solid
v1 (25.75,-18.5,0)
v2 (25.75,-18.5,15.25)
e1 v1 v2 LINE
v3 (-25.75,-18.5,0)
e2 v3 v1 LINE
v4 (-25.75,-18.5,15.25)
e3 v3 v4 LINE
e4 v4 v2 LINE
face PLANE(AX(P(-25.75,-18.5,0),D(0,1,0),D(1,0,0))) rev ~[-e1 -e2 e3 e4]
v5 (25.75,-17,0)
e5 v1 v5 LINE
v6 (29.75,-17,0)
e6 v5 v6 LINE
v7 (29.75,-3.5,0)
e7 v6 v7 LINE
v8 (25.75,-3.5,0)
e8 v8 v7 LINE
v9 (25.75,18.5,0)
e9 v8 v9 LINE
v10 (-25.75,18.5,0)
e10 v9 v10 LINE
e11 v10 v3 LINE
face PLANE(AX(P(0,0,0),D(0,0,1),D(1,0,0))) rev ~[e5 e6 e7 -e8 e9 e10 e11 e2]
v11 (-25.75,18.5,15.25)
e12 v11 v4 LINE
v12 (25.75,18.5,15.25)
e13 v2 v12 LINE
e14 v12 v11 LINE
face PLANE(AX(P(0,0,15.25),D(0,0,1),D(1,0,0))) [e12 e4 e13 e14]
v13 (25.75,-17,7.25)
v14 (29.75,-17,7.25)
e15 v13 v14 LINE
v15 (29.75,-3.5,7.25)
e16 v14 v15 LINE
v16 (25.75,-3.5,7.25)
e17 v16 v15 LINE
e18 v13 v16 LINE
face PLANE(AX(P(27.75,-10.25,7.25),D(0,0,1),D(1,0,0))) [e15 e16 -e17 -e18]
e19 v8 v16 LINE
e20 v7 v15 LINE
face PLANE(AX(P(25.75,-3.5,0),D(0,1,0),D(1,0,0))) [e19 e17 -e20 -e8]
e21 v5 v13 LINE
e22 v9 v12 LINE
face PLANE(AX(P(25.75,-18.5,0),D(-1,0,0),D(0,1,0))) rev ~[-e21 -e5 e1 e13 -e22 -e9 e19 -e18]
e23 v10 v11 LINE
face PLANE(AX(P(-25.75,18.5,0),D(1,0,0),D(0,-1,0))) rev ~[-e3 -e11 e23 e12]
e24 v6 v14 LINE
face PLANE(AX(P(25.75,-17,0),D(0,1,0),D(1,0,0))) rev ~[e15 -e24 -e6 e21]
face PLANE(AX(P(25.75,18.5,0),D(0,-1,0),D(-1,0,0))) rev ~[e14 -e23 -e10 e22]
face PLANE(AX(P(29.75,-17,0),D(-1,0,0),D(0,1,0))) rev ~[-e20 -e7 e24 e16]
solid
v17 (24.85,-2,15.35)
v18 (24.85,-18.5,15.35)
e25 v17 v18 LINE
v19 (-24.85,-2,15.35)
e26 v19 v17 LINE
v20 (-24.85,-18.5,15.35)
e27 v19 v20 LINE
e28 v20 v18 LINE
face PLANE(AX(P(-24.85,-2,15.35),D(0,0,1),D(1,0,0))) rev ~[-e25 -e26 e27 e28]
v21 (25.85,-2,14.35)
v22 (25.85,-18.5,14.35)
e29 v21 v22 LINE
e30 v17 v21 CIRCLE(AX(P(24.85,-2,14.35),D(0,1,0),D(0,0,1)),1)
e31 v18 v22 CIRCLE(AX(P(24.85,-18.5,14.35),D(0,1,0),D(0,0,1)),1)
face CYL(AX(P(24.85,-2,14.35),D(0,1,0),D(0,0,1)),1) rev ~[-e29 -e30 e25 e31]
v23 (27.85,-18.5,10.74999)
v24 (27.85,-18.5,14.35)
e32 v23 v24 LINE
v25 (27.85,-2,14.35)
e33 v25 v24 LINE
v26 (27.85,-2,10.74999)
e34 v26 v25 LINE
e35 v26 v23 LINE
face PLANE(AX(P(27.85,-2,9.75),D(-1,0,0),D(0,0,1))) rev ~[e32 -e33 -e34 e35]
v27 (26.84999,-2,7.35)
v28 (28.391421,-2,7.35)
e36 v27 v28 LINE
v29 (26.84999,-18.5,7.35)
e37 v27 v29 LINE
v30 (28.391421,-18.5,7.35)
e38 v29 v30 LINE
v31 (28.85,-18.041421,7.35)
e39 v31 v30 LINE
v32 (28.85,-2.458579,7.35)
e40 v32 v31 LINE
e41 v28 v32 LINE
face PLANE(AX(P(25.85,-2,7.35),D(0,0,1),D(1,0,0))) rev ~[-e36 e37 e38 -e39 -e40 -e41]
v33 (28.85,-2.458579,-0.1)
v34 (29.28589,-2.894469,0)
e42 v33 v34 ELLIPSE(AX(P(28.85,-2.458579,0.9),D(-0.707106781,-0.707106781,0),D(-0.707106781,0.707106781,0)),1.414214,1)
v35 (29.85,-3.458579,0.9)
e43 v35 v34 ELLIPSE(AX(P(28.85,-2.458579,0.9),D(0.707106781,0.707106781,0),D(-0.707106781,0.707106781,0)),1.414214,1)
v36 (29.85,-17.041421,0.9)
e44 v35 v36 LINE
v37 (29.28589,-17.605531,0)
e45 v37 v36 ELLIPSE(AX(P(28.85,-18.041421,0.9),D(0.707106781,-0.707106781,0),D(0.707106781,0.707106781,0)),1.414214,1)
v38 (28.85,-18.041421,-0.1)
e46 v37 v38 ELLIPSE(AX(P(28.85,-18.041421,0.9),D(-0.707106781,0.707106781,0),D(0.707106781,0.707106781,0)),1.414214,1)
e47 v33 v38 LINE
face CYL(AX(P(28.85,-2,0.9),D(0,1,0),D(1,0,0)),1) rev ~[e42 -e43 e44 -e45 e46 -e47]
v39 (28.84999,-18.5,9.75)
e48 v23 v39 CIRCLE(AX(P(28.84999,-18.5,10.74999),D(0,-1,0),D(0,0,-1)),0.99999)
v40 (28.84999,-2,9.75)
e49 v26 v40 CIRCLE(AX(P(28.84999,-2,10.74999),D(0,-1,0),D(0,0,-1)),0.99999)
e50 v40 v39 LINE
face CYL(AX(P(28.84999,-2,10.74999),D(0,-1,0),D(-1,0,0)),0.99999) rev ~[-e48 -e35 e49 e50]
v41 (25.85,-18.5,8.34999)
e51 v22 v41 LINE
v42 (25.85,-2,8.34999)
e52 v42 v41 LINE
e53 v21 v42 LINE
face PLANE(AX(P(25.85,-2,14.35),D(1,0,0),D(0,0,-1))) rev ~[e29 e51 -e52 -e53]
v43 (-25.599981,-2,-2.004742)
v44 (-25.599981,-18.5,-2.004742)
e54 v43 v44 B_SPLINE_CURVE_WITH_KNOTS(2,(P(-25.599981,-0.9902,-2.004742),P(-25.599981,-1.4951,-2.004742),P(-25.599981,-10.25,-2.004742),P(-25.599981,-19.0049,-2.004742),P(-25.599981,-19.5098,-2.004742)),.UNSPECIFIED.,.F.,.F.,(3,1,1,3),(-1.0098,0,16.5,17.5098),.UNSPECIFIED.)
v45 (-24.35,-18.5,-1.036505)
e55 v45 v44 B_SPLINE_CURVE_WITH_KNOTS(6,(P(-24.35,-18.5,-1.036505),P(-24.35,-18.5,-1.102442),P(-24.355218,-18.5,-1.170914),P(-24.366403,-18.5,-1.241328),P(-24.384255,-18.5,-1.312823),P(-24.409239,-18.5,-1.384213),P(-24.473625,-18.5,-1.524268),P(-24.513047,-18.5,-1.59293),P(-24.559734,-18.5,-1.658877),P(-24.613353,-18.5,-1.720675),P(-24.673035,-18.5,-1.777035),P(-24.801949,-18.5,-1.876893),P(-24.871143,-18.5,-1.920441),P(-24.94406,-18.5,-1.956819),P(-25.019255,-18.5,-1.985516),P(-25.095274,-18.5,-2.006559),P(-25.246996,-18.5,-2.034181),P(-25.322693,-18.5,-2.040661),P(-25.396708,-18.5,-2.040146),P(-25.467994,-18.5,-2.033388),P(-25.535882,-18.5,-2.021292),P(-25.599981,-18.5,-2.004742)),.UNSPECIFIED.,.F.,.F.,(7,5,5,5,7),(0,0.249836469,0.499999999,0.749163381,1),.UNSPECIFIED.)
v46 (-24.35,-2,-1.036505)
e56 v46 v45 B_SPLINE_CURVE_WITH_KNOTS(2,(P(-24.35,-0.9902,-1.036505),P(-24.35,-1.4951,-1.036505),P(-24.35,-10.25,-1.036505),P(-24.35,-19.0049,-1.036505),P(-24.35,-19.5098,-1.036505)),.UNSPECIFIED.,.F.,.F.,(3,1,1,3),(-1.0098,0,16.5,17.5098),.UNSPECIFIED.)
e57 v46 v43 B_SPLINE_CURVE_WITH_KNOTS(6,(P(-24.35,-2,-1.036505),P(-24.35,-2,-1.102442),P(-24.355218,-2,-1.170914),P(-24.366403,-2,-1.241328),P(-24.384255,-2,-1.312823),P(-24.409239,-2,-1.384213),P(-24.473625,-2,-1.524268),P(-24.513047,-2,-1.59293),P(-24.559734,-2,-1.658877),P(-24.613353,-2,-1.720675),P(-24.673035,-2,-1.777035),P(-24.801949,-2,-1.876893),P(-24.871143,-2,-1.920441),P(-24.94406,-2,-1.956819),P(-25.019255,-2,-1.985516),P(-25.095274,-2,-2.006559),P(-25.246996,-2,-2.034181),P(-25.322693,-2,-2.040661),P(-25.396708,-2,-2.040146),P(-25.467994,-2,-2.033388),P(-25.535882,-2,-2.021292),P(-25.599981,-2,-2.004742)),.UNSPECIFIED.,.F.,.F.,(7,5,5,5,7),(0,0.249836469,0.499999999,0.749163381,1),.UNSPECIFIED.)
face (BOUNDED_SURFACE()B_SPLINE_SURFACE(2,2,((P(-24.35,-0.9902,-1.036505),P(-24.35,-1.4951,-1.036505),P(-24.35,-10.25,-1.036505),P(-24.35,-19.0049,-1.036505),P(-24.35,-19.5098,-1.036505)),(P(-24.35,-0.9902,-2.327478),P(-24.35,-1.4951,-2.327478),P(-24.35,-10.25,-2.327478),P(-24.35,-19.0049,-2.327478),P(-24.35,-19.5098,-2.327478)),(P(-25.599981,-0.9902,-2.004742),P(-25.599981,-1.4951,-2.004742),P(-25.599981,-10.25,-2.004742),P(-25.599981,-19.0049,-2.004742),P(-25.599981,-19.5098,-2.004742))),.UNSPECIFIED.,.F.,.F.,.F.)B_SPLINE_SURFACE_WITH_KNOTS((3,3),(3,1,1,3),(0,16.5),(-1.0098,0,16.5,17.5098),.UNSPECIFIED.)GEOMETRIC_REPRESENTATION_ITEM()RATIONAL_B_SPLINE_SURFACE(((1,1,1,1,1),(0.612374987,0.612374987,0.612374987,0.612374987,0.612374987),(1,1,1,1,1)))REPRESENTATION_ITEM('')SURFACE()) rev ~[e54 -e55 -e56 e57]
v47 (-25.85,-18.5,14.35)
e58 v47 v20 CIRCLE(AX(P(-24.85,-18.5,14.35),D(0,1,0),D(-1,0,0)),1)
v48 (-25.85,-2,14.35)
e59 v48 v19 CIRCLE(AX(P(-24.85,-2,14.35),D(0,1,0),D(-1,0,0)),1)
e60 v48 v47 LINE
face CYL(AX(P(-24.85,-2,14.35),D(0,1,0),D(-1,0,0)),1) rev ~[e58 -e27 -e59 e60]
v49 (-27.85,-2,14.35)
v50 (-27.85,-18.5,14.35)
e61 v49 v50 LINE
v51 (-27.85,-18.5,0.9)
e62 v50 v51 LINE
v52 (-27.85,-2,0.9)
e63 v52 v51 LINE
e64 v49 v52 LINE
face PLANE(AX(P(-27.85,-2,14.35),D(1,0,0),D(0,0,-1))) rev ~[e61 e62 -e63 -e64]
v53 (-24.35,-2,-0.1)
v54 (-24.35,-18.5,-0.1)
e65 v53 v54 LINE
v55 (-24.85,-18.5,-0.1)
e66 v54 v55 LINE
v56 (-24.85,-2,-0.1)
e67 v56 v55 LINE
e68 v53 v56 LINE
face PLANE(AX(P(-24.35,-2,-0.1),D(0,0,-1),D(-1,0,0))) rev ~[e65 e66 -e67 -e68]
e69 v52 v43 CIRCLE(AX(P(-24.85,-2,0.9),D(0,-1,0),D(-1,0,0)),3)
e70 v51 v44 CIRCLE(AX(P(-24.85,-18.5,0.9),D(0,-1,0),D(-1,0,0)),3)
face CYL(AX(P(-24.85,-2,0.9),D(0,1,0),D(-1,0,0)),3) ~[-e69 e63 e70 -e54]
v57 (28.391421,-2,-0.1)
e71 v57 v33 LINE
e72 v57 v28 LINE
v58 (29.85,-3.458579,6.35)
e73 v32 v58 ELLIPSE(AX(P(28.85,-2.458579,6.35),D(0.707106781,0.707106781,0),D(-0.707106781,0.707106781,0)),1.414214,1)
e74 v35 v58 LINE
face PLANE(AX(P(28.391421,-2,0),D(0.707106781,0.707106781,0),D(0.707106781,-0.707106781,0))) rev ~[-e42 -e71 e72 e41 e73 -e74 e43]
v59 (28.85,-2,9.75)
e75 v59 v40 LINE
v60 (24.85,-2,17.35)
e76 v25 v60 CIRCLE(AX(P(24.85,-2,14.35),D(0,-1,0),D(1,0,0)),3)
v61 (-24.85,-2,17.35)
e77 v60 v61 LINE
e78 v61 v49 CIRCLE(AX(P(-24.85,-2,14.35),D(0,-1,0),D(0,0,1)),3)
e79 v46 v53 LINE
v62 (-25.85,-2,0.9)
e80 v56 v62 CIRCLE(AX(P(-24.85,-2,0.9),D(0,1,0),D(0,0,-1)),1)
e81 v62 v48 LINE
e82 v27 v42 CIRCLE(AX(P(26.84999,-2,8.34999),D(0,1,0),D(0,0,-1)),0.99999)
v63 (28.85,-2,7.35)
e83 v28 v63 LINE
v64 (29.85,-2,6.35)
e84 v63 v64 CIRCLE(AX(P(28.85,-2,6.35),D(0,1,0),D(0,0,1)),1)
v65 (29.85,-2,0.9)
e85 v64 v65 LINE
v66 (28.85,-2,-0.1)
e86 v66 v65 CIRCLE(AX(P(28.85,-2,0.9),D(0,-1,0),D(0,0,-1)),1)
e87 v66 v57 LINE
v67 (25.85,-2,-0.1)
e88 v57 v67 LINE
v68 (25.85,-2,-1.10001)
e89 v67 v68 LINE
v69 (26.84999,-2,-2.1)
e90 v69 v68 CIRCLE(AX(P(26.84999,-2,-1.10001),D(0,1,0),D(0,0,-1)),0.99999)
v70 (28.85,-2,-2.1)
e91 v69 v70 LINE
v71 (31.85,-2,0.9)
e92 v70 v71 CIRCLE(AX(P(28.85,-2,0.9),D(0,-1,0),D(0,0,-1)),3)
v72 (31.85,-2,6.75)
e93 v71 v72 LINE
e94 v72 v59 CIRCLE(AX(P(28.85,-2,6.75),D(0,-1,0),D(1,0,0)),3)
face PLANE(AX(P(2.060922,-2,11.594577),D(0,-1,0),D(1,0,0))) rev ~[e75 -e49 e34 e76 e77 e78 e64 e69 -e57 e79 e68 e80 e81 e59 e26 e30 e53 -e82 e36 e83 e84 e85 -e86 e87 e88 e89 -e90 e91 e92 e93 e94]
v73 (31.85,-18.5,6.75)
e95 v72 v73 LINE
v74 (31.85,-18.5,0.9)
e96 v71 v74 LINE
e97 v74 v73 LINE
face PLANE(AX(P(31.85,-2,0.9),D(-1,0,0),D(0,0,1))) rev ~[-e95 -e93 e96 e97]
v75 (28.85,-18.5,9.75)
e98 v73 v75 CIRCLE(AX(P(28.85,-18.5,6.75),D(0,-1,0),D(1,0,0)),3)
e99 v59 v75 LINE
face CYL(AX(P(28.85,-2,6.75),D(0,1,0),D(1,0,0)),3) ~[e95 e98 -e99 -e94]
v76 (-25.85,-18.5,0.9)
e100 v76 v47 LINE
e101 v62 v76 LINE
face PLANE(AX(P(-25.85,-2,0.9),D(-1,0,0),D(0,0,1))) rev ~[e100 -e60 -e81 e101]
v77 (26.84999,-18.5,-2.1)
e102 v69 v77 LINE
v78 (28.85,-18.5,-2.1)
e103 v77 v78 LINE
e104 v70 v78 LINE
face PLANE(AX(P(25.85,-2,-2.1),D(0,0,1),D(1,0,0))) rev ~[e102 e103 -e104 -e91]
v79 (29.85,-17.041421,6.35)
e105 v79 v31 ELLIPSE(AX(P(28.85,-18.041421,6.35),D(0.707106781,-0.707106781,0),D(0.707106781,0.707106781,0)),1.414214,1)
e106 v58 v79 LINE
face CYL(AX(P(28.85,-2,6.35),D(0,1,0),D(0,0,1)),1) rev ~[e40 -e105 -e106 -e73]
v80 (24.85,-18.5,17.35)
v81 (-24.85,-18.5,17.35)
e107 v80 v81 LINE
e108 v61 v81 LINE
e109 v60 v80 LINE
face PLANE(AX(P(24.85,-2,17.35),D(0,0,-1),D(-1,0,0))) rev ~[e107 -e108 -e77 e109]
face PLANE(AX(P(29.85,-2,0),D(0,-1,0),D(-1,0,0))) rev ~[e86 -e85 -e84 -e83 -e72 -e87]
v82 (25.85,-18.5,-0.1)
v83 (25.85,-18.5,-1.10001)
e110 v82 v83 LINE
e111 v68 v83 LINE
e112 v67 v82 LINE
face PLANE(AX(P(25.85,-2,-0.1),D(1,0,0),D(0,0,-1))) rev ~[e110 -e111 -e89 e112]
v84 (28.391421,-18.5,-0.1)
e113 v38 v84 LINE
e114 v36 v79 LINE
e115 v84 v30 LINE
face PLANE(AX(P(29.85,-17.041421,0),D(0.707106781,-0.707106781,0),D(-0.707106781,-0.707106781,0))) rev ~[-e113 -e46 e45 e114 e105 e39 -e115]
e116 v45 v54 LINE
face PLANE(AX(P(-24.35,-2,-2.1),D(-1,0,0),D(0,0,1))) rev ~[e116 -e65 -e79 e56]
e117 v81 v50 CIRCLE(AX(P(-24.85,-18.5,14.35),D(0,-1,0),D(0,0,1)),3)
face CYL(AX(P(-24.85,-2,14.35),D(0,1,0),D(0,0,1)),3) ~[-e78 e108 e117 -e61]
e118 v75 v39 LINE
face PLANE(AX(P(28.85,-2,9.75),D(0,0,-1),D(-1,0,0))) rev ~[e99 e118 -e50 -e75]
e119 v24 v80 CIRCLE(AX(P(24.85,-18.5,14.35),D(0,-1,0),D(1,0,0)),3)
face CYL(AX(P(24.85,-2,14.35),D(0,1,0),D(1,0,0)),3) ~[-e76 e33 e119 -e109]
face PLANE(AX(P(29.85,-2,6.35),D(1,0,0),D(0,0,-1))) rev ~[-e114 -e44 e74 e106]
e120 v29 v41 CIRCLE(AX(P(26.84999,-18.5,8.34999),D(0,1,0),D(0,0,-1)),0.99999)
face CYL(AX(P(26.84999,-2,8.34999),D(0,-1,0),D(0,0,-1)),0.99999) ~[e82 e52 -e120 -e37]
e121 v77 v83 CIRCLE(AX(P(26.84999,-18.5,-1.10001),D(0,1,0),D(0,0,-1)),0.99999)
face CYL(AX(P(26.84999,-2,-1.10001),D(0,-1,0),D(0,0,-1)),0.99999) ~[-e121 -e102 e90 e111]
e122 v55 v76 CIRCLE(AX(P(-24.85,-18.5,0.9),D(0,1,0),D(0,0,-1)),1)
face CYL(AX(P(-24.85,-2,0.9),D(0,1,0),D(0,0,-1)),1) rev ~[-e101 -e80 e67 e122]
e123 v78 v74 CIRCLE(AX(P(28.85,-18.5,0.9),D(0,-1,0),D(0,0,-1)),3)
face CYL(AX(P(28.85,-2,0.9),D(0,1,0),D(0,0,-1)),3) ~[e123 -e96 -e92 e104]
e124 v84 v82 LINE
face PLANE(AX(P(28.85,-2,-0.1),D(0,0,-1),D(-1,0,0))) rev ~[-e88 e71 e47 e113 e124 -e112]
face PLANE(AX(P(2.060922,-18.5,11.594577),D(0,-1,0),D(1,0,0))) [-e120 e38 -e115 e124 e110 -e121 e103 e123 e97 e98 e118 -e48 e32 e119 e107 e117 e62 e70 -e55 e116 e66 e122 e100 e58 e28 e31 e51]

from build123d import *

# Parameters (mm, degrees)
F0_W          = 4
F0_H          = 13.5
F1_DEPTH      = 7.25
F2_DEPTH      = 15.25
F4_START      = 2
F4_DEPTH      = 16.5
F6_DEPTH      = 0.1
F6_DEPTH_BACK = 7.35
F7_R          = 0.99999


# Not quite as in the source:
# - a fillet or chamfer is up to 0.001 mm smaller than in the source, because OpenCascade refuses the exact size


with BuildPart() as f1:
    # F0 (on Top) → F1 (new body)
    with BuildSketch(Plane.XY):
        with Locations((27.75, -10.25)):
            Rectangle(F0_W, F0_H)
    extrude(amount=F1_DEPTH)

    # F0 (on Top) → F2 (join)
    with BuildSketch(Plane.XY):
        Polygon((25.75, 18.5), (-25.75, 18.5), (-25.75, -18.5), (25.75, -18.5), (25.75, -17), (25.75, -3.5), align=None)
    extrude(amount=F2_DEPTH)


with BuildPart() as f4:
    # F3 (on Front) → F4 (new body)
    with BuildSketch(Plane.XZ.offset(F4_START)):
        with BuildLine():
            Line((-24.85, 15.35), (24.85, 15.35))
            ThreePointArc((24.85, 15.35), (25.5571067812, 15.0571067812), (25.85, 14.35))
            Line((25.85, 14.35), (25.85, 7.35))
            Line((25.85, 7.35), (28.85, 7.35))
            ThreePointArc((28.85, 7.35), (29.5571067812, 7.0571067812), (29.85, 6.35))
            Line((29.85, 6.35), (29.85, 0.9))
            ThreePointArc((29.85, 0.9), (29.5571067812, 0.1928932188), (28.85, -0.1))
            Line((28.85, -0.1), (26, -0.1))
            Line((26, -0.1), (25.85, -0.1))
            Line((25.85, -0.1), (25.85, -2.1))
            Line((25.85, -2.1), (26, -2.1))
            Line((26, -2.1), (28.85, -2.1))
            ThreePointArc((28.85, -2.1), (30.9713203436, -1.2213203436), (31.85, 0.9))
            Line((31.85, 0.9), (31.85, 6.75))
            ThreePointArc((31.85, 6.75), (30.9713203436, 8.8713203436), (28.85, 9.75))
            Line((28.85, 9.75), (27.85, 9.75))
            Line((27.85, 9.75), (27.85, 14.35))
            ThreePointArc((27.85, 14.35), (26.9713203436, 16.4713203436), (24.85, 17.35))
            Line((24.85, 17.35), (-24.85, 17.35))
            ThreePointArc((-24.85, 17.35), (-26.9713203436, 16.4713203436), (-27.85, 14.35))
            Line((-27.85, 14.35), (-27.85, 0.9))
            ThreePointArc((-27.85, 0.9), (-26.9713203436, -1.2213203436), (-24.85, -2.1))
            Line((-24.85, -2.1), (-24.35, -2.1))
            Line((-24.35, -2.1), (-24.35, -0.1))
            Line((-24.35, -0.1), (-24.85, -0.1))
            ThreePointArc((-24.85, -0.1), (-25.5571067812, 0.1928932188), (-25.85, 0.9))
            Line((-25.85, 0.9), (-25.85, 14.35))
            ThreePointArc((-25.85, 14.35), (-25.5571067812, 15.0571067812), (-24.85, 15.35))
        make_face()
    extrude(amount=F4_DEPTH)

    # F5 (on Top) → F6 (join, two sides)
    with BuildSketch(Plane.XY) as f6_sk:
        Polygon((29.85, -3.4585786438), (29.85, -2.0000000002), (28.3914213564, -2.0000000001), align=None)
        Polygon((28.3914213559, -18.5000000004), (29.85, -18.5000000004), (29.85, -17.0414213562), align=None)
    extrude(amount=-F6_DEPTH)
    extrude(f6_sk.sketch, amount=F6_DEPTH_BACK)

    # F7 (radius 1 in the source; OpenCascade refuses exactly that, so slightly less here)
    f7_edges = [f4.edges().sort_by_distance(p)[0] for p in [
        (25.85, -10.25, 7.35),
        (27.85, -10.25, 9.75),
        (-24.35, -10.25, -2.1),
        (25.85, -10.25, -2.1),
    ]]
    fillet(f7_edges, radius=F7_R)


solid = Compound([f1.part, f4.part])
